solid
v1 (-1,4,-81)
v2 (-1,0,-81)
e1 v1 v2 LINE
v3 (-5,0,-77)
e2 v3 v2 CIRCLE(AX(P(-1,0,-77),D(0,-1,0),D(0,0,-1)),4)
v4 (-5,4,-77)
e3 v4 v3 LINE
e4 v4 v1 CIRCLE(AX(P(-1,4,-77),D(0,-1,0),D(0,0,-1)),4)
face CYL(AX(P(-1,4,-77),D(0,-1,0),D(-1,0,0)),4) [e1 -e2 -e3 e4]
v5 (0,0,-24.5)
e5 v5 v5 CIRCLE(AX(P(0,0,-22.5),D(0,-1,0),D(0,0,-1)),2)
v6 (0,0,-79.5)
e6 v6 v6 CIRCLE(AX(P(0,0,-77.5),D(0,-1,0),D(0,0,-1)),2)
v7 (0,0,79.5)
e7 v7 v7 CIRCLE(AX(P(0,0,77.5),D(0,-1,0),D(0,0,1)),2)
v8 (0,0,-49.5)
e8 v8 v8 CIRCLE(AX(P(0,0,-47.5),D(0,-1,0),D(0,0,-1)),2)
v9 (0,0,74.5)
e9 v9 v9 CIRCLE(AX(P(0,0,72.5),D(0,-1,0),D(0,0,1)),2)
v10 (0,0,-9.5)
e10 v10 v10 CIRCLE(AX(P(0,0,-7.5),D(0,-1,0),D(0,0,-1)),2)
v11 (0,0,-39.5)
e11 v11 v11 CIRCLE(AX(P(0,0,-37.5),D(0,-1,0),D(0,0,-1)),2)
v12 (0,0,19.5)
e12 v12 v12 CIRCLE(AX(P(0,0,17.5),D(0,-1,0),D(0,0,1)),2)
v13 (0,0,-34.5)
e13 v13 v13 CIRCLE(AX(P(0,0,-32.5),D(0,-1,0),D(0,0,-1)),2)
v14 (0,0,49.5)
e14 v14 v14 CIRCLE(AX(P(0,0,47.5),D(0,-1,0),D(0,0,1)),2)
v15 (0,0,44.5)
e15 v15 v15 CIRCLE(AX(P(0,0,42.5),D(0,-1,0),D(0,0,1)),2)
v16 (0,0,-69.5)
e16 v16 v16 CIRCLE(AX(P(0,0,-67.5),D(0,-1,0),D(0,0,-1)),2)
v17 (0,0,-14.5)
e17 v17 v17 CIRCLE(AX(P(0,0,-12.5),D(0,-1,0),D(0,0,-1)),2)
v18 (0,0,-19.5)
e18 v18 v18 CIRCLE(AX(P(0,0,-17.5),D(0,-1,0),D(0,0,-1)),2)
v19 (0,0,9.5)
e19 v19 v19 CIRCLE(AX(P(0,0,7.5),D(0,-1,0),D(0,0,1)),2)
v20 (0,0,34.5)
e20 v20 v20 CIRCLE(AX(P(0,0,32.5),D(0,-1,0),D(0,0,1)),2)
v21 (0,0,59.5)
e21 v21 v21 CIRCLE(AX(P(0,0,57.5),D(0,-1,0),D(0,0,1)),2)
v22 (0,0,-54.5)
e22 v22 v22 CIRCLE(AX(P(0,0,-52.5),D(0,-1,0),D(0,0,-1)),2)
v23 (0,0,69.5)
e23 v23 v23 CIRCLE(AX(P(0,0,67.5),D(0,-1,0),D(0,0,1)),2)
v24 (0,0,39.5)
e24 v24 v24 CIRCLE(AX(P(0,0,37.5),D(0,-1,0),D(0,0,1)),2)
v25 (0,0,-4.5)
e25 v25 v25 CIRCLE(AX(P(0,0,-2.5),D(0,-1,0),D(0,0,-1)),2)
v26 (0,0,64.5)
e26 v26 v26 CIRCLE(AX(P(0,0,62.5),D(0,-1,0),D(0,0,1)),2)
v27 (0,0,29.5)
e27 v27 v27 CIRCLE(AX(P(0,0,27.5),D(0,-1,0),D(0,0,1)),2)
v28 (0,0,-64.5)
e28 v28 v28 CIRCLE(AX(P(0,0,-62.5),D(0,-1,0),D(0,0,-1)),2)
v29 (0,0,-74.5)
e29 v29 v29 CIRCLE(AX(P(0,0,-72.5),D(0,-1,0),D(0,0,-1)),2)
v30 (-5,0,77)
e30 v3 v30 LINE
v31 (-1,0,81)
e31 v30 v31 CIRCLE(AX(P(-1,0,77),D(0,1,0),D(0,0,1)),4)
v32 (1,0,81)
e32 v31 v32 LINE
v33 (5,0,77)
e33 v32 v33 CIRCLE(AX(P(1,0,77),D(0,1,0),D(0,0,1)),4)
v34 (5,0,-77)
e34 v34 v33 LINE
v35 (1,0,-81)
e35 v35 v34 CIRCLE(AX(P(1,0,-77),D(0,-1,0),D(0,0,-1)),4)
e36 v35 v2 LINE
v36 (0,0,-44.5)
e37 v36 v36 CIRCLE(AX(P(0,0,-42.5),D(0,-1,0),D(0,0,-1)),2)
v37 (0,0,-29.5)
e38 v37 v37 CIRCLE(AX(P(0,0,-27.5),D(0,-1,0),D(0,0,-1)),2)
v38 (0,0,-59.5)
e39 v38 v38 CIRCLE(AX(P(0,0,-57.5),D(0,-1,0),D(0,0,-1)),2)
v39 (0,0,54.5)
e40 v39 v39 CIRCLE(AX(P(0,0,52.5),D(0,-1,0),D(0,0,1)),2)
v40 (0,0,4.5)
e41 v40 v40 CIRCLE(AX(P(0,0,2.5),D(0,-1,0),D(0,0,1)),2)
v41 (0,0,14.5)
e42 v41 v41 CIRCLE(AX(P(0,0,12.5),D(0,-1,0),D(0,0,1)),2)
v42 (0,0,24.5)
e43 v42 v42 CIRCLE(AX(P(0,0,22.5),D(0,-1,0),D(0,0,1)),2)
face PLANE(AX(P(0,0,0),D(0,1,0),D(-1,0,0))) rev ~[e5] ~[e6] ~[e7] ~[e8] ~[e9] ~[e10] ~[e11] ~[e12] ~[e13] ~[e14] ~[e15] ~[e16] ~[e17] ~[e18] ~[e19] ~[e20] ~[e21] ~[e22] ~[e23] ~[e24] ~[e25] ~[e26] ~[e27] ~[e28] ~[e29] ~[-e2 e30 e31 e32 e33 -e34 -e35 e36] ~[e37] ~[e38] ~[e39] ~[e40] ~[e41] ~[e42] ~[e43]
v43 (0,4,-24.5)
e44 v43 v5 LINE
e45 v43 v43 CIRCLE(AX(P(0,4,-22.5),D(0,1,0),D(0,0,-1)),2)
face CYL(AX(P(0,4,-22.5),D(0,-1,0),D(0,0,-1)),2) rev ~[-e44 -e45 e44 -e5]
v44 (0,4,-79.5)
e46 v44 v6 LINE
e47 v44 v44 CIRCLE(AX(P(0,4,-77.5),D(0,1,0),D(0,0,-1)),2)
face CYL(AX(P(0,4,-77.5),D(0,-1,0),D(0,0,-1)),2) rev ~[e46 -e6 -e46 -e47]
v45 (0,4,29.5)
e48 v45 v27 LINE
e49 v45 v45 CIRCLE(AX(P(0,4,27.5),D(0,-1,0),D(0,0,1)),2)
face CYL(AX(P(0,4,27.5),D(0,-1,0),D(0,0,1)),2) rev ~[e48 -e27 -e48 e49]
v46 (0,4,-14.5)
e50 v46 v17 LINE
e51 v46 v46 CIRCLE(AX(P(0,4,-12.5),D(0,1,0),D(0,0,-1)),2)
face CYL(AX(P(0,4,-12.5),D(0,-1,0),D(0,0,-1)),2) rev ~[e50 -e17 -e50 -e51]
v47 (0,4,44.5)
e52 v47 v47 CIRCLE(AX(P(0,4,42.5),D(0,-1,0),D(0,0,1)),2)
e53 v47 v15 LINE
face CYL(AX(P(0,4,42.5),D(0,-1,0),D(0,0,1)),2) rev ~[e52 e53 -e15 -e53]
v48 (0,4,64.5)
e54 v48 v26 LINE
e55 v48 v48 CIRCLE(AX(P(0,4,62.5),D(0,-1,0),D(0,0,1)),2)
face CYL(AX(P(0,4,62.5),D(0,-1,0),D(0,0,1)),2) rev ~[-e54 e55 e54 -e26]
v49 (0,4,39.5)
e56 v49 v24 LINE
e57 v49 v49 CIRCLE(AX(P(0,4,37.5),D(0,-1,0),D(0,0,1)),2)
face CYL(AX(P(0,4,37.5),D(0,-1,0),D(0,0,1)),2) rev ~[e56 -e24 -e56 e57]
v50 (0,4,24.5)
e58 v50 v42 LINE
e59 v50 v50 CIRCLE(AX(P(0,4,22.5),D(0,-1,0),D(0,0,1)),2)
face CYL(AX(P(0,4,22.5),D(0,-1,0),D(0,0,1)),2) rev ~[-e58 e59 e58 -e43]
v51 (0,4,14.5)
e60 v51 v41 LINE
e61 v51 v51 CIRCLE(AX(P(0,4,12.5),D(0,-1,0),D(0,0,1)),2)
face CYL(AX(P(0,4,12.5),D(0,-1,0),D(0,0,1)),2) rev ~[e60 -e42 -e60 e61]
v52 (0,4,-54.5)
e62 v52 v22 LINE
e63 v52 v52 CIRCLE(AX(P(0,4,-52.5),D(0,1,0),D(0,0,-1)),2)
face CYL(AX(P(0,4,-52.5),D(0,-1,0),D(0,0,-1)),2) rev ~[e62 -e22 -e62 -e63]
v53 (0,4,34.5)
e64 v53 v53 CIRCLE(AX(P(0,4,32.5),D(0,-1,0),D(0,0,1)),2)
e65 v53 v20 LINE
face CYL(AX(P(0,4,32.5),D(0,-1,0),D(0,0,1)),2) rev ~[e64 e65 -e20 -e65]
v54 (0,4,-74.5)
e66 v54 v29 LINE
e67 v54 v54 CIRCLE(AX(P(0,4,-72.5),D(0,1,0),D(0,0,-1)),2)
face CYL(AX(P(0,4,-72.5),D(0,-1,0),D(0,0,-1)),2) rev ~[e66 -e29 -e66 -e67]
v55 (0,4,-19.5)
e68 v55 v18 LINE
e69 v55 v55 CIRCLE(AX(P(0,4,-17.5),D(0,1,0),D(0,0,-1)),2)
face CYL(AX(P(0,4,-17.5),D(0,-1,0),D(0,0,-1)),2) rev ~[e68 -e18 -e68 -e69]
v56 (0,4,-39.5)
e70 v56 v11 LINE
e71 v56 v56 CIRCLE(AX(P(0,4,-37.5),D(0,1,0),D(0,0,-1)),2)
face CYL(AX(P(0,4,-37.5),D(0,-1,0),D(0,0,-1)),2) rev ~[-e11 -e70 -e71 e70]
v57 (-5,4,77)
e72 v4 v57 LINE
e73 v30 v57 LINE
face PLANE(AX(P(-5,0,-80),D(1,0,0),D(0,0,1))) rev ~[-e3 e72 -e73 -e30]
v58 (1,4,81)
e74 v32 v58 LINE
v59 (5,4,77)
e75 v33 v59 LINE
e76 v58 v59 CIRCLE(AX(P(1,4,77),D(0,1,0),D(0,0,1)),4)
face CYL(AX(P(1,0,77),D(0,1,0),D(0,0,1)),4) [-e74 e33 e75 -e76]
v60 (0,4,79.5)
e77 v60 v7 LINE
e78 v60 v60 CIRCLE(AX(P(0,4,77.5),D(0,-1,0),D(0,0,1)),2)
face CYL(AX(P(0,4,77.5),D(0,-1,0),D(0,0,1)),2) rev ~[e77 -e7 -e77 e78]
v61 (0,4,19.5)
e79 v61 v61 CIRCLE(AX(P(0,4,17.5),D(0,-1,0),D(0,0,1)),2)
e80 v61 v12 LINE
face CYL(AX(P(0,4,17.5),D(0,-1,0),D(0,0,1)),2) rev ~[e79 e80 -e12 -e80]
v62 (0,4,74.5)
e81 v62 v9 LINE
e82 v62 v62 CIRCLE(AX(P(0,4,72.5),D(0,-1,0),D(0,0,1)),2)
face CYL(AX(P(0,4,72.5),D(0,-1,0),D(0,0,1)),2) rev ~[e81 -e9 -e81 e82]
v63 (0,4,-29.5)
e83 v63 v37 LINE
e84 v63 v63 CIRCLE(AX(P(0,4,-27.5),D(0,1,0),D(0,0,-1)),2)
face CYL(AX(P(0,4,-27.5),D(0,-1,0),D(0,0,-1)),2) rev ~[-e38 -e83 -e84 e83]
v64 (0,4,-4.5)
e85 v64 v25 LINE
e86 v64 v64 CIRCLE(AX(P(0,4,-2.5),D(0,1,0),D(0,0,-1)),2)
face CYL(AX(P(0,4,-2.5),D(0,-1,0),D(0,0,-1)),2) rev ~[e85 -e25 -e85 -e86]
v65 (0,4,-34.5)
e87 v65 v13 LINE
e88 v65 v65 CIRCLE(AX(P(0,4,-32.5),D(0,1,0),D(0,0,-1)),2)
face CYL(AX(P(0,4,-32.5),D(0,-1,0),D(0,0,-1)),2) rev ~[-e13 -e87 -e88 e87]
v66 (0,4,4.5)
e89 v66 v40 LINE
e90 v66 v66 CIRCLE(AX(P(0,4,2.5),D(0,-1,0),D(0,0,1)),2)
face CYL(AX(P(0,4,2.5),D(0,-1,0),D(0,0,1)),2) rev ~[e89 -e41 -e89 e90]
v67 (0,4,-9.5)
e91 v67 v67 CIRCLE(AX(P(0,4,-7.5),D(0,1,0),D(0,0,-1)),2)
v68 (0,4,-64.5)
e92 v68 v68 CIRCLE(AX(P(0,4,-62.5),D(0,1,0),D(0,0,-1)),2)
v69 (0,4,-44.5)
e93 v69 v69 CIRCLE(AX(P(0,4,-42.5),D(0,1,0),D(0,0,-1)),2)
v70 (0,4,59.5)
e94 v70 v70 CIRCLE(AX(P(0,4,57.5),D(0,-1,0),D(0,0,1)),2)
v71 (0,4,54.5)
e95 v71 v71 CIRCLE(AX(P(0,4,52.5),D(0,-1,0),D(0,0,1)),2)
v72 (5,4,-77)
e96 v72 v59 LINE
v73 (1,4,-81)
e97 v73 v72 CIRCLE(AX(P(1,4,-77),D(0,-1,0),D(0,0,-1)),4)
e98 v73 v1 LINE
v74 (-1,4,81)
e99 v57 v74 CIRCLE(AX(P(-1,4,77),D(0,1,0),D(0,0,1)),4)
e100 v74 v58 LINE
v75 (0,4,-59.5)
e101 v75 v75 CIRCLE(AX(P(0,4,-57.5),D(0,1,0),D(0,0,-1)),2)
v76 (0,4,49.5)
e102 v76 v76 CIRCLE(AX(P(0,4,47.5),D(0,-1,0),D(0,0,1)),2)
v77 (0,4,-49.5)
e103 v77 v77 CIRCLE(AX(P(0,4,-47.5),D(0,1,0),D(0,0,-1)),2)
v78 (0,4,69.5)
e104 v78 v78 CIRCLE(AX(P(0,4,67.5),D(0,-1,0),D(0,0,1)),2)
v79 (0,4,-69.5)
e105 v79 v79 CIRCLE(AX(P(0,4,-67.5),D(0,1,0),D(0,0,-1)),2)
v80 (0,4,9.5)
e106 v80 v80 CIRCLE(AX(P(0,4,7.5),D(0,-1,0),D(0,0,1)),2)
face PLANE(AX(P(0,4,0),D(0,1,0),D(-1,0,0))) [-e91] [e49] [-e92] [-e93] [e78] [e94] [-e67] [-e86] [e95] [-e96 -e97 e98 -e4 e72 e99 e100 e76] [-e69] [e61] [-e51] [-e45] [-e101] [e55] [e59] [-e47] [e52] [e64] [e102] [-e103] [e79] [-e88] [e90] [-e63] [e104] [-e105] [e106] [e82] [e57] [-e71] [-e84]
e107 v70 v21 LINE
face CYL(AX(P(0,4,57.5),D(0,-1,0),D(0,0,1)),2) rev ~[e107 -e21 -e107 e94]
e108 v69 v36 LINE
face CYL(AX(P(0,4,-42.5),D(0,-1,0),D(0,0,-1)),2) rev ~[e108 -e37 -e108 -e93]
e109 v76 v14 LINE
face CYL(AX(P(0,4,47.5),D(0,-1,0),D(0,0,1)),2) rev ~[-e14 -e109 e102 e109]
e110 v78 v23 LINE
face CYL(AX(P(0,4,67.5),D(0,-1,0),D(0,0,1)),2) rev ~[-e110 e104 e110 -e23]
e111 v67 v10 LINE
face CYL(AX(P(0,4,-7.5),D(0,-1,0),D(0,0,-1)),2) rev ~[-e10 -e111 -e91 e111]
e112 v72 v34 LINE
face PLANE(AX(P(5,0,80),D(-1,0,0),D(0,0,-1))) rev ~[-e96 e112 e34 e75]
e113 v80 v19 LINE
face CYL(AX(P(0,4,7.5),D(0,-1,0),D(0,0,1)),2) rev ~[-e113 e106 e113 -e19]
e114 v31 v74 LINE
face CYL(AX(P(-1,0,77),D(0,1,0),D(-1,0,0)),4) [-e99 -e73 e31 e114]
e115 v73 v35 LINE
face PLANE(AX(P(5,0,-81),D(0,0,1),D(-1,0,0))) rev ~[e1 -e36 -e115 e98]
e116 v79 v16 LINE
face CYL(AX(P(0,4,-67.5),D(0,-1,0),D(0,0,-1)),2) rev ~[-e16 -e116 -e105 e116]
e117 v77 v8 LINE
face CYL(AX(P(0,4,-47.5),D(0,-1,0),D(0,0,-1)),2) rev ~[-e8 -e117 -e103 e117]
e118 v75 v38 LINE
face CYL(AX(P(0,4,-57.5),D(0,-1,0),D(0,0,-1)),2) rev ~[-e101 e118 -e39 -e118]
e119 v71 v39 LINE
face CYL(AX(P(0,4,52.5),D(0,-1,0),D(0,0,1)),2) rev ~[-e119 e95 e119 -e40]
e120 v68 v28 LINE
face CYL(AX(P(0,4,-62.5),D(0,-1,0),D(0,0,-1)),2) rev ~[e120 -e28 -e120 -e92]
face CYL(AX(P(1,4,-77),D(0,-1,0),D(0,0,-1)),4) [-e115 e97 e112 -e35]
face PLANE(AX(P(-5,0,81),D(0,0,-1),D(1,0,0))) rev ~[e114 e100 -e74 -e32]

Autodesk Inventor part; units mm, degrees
ref_plane "YZ Plane" through (0, 0, 0) normal (1, 0, 0) x (0, 1, 0)
ref_plane "XZ Plane" through (0, 0, 0) normal (0, 1, 0) x (-1, 0, 0)
ref_plane "XY Plane" through (0, 0, 0) normal (0, 0, 1) x (1, 0, 0)
sketch "Sketch1" plane through (0, 0, 0) normal (0, 1, 0) x (-1, 0, 0)
  line L0 (5, 80) -> (-5, 80)
  line L1 (-5, 80) -> (-5, -80)
  line L2 (-5, -80) -> (5, -80)
  line L3 (5, -80) -> (5, 80)
  line L4 (5, 80) -> (-5, -80) construction
  line L5 (-5, 80) -> (5, -80) construction
  point P0 (0, 0)
  dimension "d0" = 10
  dimension "d1" = 160
extrude "Extrusion1" add sketch "Sketch1" along normal blind 4
sketch "Sketch2" plane through (0, 4, 0) normal (0, 1, 0) x (1, 0, 0)
  line L0 (-5, -80) -> (5, -80) projected
  line L1 (-5, 80) -> (-5, -80) projected
  line L2 (-5, -80) -> (5, -80) projected
  line L3 (5, -80) -> (5, 80) projected
  line L4 (5, 80) -> (-5, 80) projected
  point P0 (0, 0)
  point P1 (0, -77.5)
  point P2 (0, -72.5)
  point P3 (0, -67.5)
  point P4 (0, -62.5)
  point P5 (0, -57.5)
  point P6 (0, -52.5)
  point P7 (0, -47.5)
  point P8 (0, -42.5)
  point P9 (0, -37.5)
  point P10 (0, -32.5)
  point P11 (0, -27.5)
  point P12 (0, -22.5)
  point P13 (0, -17.5)
  point P14 (0, -12.5)
  point P15 (0, -7.5)
  point P16 (0, -2.5)
  dimension "d4" = 2.5
  dimension "d7" = 5
  dimension "d24" = 0
hole "Hole1" at (0, 4, 77.5) at (0, 4, 72.5) at (0, 4, 67.5) at (0, 4, 62.5) at (0, 4, 57.5) at (0, 4, 52.5) at (0, 4, 47.5) at (0, 4, 42.5) at (0, 4, 37.5) at (0, 4, 32.5) at (0, 4, 27.5) at (0, 4, 22.5) at (0, 4, 17.5) at (0, 4, 12.5) at (0, 4, 7.5) at (0, 4, 2.5) direction (0, -1, 0) diameter 4 end through all
thicken "Thicken1" operation add thickness 1 both sides no extend neighbours yes toward (0, 0, 1) faces at (-1.6667, 1.3333, 80)
thicken "Thicken2" operation add thickness 1 both sides no extend neighbours yes toward (0, 0, -1) faces at (1.6667, 1.3333, -80)
fillet "Fillet1" radius 4 4 edges at (-5, 2, -81) (5, 2, -81) (5, 2, 81) (-5, 2, 81)
mirror "Mirror1" about plane through (0, 0, 0) normal (0, 0, 1) of "Hole1"
properties part number "rearLeg_bot"
